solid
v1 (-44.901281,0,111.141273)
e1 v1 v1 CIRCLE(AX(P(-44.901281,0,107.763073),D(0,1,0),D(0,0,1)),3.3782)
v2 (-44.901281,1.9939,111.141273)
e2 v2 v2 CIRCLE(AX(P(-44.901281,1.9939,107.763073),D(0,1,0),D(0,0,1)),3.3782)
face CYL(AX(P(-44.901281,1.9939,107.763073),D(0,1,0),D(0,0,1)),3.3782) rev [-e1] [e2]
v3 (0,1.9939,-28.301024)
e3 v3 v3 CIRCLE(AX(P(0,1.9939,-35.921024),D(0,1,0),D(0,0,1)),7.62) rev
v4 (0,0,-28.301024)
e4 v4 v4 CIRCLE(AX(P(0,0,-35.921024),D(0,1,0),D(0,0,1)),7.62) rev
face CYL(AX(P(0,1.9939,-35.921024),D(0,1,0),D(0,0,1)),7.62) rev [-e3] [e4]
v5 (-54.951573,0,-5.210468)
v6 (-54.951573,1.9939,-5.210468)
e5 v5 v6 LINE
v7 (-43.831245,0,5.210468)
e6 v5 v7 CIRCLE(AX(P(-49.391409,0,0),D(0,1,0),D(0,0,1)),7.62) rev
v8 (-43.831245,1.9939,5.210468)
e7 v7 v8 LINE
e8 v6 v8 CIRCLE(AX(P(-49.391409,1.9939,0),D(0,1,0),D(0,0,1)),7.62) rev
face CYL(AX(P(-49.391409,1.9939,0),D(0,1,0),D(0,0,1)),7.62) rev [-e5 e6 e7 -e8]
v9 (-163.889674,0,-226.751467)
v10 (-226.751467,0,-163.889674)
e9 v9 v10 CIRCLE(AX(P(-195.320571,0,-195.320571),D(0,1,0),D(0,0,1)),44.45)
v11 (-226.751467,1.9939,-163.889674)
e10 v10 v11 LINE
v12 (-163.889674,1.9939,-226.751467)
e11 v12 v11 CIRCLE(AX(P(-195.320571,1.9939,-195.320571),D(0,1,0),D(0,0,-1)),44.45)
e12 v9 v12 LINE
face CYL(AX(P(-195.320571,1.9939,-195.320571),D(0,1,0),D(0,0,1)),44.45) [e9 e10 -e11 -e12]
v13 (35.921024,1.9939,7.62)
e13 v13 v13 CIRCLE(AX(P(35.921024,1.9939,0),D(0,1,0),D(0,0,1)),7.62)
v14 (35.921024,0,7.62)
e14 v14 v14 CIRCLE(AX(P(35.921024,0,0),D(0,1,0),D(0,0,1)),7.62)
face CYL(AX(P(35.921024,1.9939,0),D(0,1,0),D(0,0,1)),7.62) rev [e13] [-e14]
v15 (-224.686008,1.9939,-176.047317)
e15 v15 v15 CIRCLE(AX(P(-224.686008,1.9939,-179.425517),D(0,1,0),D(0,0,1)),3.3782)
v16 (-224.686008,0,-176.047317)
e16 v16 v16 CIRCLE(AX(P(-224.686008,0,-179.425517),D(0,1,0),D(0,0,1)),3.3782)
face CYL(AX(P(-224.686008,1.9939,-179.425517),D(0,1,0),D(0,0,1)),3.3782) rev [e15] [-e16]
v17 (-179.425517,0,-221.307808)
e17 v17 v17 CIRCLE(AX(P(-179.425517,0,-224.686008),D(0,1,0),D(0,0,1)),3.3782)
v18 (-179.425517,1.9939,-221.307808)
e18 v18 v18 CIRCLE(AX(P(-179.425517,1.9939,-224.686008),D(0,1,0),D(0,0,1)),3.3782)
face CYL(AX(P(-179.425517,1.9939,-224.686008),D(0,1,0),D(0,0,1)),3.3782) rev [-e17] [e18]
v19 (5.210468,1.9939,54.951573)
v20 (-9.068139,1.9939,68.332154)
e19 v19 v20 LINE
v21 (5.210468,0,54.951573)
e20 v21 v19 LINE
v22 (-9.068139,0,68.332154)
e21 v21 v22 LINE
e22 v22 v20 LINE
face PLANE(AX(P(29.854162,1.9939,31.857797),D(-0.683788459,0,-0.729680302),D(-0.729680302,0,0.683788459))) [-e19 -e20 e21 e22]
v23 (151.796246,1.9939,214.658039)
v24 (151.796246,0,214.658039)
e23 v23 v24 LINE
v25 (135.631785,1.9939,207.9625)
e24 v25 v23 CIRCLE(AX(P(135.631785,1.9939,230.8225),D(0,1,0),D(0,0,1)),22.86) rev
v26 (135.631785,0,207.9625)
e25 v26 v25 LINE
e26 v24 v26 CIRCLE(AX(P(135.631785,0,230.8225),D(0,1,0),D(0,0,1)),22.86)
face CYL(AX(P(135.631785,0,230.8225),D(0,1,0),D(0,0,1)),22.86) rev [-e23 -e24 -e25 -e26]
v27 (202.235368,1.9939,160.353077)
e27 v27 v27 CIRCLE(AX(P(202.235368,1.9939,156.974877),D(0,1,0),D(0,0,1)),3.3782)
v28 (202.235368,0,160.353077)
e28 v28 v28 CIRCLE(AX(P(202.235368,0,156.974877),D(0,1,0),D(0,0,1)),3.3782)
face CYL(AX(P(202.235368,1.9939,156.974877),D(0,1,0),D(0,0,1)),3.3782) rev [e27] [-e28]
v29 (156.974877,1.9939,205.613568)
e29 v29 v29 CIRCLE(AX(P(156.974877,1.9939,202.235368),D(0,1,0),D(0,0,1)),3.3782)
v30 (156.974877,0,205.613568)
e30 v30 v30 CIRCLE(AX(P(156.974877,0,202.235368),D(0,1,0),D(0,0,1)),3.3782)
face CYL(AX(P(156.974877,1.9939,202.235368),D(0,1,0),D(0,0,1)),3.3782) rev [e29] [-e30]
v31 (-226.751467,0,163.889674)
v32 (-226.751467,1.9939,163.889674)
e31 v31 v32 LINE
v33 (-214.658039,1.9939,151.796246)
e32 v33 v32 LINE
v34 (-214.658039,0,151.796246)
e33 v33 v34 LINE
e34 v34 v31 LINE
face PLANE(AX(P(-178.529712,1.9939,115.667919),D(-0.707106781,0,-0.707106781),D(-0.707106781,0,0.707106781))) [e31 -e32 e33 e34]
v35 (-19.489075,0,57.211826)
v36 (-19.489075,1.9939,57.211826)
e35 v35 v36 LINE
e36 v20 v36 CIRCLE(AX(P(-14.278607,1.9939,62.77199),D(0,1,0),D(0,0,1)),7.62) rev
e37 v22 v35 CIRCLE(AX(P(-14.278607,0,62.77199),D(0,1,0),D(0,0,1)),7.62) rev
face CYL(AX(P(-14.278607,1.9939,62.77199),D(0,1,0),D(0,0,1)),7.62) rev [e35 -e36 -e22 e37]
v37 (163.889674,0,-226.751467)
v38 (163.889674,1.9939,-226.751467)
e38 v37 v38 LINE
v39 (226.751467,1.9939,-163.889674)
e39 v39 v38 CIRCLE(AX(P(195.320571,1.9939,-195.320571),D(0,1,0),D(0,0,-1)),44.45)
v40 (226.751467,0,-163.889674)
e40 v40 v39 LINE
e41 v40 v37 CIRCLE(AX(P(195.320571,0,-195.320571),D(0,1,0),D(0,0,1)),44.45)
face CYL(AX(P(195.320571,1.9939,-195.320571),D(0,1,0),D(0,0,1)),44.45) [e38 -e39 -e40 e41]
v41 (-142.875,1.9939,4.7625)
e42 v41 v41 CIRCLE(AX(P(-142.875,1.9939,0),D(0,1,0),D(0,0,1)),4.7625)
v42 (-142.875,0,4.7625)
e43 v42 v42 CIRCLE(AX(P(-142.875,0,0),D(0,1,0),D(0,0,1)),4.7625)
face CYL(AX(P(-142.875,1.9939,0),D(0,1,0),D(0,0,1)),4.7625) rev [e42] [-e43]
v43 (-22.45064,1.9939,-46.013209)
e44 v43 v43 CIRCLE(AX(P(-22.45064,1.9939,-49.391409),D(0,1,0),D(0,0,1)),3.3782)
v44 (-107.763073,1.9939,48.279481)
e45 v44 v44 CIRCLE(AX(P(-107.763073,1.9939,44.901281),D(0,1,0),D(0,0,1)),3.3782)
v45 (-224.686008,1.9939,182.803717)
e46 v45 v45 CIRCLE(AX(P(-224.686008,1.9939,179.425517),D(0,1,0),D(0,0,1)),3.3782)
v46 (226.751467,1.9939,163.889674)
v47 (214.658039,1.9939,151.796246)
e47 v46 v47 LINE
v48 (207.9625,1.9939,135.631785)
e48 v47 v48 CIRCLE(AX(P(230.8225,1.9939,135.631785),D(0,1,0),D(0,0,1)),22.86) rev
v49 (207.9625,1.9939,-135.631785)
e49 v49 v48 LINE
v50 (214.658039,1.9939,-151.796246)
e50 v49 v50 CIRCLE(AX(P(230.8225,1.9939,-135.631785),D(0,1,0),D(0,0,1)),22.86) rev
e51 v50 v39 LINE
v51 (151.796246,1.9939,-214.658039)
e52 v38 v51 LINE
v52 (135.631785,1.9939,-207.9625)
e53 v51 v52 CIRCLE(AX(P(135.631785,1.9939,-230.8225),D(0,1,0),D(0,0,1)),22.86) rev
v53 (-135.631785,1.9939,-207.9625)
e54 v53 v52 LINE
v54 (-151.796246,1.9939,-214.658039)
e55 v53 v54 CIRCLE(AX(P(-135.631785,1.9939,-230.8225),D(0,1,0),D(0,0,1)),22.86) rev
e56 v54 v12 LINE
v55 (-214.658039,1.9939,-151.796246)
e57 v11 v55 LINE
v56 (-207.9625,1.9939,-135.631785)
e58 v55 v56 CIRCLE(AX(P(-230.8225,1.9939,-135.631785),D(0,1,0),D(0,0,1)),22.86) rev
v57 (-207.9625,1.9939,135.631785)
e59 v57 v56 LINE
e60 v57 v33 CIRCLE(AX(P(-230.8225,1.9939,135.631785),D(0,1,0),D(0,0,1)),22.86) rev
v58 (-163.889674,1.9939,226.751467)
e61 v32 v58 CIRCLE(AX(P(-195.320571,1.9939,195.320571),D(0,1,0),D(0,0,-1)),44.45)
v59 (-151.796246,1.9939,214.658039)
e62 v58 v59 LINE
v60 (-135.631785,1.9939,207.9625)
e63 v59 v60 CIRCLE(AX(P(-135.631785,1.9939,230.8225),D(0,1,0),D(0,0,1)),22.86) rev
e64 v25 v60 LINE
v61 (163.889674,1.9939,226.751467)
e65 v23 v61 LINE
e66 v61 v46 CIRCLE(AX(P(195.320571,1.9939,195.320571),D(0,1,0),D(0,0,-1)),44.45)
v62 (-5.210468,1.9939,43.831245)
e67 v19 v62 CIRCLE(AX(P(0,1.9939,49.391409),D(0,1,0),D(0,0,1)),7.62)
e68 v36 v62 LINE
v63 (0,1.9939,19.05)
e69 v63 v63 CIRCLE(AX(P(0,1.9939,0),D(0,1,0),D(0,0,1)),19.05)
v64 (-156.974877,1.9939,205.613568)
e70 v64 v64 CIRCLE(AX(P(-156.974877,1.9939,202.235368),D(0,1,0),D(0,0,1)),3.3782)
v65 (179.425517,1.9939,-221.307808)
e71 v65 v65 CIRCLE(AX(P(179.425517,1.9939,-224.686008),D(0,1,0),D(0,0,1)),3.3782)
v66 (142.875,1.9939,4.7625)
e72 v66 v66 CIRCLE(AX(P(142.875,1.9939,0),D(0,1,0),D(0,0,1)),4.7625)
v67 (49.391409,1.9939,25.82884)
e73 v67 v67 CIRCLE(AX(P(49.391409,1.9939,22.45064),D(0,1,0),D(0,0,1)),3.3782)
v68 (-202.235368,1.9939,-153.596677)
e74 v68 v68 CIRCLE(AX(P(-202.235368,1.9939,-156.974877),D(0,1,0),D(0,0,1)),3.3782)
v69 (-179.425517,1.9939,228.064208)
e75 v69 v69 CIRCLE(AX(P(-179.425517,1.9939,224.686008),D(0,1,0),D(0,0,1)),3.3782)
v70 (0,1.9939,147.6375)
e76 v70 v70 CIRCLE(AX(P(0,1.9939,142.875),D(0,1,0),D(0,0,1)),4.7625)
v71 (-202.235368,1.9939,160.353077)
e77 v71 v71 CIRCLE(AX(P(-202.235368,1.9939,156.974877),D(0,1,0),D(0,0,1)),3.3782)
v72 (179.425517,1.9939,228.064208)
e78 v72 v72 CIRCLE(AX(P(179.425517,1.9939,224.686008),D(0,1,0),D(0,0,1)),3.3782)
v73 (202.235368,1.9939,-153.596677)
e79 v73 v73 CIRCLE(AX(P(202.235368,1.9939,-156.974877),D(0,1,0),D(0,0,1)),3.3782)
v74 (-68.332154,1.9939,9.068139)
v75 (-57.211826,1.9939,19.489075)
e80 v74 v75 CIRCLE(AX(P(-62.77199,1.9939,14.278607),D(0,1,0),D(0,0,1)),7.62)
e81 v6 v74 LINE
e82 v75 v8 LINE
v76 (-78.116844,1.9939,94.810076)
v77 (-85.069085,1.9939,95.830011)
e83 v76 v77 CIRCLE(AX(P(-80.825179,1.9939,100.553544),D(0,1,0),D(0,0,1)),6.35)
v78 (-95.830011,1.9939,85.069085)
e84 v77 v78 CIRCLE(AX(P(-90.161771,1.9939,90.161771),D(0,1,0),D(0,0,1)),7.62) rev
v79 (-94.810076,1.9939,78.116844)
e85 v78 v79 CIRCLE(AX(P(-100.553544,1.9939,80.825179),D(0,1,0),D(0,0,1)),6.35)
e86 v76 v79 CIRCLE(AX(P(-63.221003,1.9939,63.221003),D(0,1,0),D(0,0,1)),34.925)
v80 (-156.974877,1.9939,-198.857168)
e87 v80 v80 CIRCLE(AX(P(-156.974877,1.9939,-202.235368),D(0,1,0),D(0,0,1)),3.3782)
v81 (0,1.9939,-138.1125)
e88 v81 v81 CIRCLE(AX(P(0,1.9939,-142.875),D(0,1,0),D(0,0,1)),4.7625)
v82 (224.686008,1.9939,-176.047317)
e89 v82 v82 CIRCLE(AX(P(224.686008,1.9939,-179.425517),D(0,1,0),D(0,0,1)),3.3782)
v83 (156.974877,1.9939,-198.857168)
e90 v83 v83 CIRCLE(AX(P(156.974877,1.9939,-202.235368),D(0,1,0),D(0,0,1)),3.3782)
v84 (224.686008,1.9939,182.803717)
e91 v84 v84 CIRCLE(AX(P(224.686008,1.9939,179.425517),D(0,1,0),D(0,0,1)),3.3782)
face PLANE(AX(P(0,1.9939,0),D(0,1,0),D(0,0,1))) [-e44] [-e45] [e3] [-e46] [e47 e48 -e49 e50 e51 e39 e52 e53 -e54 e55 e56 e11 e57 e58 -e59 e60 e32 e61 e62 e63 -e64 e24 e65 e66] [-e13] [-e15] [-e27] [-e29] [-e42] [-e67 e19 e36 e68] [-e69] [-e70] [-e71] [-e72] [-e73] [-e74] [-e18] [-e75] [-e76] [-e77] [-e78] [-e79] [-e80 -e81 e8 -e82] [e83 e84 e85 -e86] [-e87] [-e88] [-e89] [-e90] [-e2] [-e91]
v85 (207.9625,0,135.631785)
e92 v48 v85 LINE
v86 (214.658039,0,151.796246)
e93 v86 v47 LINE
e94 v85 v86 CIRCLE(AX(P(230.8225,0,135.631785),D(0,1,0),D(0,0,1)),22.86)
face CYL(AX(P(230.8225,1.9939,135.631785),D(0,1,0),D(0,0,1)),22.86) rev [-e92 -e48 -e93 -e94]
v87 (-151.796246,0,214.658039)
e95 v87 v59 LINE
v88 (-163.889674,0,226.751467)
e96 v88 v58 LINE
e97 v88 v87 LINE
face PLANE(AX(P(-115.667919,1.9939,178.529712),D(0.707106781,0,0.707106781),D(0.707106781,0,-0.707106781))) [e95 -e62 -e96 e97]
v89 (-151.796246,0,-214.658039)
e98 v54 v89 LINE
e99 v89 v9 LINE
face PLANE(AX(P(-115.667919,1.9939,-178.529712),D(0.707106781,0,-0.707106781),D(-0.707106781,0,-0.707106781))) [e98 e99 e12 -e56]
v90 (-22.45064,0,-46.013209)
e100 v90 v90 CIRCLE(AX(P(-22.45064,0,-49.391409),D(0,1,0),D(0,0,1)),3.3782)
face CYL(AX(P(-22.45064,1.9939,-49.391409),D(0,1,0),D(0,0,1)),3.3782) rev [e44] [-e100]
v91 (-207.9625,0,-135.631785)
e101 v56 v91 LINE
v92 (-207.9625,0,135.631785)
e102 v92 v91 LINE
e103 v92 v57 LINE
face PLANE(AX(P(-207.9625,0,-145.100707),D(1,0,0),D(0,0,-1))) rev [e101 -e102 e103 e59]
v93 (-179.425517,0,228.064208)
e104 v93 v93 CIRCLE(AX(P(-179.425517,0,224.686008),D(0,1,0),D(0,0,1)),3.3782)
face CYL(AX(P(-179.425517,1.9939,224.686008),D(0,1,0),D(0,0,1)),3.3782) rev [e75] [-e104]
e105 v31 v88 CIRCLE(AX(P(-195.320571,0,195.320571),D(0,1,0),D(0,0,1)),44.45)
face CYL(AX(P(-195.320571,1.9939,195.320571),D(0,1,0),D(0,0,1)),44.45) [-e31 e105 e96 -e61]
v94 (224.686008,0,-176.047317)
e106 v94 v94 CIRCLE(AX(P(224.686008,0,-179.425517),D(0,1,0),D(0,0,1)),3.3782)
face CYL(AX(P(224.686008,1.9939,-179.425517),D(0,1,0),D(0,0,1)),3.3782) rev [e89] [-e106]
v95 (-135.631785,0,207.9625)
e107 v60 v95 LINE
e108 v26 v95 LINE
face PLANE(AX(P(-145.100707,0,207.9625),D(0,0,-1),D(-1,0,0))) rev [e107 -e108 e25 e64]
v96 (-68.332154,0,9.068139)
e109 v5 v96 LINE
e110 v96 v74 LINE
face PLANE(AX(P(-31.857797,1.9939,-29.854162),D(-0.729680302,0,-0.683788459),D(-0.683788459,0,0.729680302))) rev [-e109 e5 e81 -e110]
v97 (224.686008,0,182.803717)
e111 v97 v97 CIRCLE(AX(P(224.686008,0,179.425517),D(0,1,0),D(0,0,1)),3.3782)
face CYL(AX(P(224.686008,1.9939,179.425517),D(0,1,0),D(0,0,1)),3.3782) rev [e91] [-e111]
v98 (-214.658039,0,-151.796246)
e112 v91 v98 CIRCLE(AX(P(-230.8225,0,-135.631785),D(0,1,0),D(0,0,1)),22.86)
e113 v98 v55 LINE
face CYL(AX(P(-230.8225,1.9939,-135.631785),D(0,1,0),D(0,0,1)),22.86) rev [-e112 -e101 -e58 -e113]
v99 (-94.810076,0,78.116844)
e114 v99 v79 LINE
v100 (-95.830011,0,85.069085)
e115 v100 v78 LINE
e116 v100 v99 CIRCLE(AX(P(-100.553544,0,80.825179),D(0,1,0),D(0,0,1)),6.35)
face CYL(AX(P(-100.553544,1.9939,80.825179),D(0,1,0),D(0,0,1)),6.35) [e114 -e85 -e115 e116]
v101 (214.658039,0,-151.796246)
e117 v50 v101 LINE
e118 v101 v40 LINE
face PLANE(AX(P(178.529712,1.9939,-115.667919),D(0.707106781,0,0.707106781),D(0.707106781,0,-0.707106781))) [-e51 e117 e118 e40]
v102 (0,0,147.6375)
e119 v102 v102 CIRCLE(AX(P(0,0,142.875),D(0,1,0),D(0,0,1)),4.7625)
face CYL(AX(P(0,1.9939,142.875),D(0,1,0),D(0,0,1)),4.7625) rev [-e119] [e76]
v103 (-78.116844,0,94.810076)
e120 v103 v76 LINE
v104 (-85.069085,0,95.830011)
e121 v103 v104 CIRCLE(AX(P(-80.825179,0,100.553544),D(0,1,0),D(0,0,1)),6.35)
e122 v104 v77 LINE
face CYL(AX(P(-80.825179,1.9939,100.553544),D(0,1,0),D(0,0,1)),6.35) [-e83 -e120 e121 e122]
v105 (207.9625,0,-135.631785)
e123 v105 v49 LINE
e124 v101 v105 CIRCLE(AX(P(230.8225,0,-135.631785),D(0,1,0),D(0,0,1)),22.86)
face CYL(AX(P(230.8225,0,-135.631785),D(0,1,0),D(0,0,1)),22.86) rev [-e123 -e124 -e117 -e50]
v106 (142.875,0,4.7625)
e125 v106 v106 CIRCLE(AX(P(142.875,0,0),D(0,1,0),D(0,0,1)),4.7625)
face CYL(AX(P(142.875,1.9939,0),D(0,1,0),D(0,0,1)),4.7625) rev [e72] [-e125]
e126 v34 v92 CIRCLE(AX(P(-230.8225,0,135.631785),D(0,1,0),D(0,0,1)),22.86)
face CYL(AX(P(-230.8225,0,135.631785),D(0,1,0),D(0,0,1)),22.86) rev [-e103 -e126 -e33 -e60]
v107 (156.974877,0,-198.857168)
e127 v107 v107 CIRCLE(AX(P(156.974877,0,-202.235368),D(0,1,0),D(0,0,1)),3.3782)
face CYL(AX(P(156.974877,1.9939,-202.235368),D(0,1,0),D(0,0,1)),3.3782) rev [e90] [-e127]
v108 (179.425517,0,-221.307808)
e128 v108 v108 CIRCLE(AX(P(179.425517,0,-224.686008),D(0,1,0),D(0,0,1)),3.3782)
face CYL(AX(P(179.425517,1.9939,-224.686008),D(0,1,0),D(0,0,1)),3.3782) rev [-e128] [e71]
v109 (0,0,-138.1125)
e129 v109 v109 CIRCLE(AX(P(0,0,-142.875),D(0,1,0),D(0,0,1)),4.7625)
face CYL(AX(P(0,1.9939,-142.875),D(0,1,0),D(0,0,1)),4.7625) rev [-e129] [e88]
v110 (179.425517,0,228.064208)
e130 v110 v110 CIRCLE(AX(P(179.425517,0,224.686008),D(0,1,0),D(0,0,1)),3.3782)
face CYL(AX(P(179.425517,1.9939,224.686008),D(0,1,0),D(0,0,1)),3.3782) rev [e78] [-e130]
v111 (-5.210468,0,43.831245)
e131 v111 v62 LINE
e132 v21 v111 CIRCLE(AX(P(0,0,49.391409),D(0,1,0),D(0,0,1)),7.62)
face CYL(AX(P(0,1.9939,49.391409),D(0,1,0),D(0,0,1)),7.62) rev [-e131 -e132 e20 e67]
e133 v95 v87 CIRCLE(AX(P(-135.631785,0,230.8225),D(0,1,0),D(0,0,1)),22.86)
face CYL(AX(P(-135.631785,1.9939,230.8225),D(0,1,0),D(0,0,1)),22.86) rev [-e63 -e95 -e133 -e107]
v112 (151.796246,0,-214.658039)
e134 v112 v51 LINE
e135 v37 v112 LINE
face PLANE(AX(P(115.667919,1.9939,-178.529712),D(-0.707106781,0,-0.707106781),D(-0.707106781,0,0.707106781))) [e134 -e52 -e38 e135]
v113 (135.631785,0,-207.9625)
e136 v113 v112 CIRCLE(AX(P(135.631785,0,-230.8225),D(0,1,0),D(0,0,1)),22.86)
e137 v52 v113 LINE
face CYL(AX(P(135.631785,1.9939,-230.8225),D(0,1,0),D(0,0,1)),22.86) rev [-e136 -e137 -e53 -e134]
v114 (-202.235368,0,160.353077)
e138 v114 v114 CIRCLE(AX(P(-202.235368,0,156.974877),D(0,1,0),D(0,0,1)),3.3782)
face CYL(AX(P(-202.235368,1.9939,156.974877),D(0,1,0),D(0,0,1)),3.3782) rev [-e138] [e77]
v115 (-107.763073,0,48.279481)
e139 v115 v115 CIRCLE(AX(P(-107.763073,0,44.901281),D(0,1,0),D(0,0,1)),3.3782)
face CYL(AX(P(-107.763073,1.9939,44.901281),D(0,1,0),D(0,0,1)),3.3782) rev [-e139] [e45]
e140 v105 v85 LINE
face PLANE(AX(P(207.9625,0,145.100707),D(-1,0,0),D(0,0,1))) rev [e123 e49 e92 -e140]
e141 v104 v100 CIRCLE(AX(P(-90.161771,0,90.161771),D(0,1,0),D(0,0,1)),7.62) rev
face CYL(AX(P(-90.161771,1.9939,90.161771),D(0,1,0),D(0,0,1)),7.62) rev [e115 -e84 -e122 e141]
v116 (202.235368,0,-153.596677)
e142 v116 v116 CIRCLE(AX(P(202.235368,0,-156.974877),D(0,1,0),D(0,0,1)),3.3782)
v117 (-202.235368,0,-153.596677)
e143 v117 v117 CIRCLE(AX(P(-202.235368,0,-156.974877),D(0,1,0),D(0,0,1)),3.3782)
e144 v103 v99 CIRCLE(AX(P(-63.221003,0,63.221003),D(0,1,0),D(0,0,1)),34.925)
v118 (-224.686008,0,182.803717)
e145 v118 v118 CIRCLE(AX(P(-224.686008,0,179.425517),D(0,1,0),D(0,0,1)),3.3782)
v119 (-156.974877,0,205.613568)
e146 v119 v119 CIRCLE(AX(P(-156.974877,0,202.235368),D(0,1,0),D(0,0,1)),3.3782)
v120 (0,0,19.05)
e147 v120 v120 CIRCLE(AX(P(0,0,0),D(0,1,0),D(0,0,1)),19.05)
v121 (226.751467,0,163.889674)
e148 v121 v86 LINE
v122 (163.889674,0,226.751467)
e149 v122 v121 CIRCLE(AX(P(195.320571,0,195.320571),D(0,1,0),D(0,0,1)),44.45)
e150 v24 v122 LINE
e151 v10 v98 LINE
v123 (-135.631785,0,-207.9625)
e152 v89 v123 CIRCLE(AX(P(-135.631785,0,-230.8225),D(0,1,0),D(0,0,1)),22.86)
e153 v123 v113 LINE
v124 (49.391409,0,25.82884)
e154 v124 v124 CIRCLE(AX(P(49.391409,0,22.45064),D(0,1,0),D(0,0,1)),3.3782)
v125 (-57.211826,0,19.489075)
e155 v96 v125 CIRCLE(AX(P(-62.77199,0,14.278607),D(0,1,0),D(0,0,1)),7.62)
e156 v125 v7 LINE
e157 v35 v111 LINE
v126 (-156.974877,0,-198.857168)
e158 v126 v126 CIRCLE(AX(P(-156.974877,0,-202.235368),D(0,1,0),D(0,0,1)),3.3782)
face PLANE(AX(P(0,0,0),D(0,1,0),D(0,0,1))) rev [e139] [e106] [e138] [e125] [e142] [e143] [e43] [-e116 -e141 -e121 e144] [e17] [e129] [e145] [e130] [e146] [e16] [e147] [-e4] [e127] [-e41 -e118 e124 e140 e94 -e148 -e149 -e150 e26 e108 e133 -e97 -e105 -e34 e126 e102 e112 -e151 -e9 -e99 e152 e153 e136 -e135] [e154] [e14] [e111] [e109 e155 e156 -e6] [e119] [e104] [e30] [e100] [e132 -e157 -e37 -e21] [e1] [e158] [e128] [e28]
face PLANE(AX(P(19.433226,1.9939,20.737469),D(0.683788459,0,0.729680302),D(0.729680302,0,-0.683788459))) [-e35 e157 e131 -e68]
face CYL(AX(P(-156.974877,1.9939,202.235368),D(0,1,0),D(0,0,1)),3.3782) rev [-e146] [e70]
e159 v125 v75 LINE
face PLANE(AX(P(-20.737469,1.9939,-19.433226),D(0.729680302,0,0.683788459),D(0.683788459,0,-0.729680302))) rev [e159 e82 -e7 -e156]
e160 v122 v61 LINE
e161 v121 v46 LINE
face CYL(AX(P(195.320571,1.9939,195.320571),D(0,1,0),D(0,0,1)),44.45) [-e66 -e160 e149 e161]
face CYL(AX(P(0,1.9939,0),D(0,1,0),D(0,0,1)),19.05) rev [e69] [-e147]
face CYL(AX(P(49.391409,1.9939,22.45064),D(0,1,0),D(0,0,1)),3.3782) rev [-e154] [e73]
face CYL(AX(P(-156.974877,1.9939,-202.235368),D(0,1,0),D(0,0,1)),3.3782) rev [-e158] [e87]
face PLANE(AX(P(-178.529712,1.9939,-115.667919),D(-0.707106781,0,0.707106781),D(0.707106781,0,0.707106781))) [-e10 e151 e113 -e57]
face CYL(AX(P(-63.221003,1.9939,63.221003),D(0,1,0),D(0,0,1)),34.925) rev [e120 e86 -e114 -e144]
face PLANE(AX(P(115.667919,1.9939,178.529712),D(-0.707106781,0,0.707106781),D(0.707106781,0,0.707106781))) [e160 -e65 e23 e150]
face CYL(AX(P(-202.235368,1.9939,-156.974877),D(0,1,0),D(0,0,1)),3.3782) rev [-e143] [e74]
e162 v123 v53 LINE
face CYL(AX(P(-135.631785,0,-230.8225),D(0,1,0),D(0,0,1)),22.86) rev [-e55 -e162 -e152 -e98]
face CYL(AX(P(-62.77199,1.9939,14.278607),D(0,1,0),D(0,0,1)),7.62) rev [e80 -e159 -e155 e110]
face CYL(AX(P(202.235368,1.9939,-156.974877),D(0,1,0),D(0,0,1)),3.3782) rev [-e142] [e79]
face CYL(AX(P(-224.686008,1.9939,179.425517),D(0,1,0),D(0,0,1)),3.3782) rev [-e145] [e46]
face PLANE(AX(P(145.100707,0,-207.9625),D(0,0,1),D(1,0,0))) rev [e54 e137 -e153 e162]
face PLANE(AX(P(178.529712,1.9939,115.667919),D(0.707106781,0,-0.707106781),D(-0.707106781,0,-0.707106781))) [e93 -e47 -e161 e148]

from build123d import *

# Parameters (mm, degrees)
SKETCH1_R                    = 212.725
BOSS_EXTRUDE1_DEPTH          = 1.9939
SKETCH2_R                    = 19.05
SKETCH2_R_2                  = 7.62
SKETCH2_R_3                  = 34.925
CUT_EXTRUDE1_DEPTH           = 301.845187575
BOSS_EXTRUDE2_START          = -1.9939
BOSS_EXTRUDE2_DEPTH          = 1.9939
FILLET1_R                    = 25.4
F_1_4_CLEARANCE_HOLE2_D      = 6.7564
FILLET2_R                    = 6.35
BOSS_EXTRUDE3_START          = -1.9939
BOSS_EXTRUDE3_DEPTH          = 1.9939
F_3_8_0_405_DIAMETER_HOLE1_D = 9.525
CUT_EXTRUDE2_DEPTH           = 340.09265521
FILLET3_R                    = 22.86


with BuildPart() as part:
    # Sketch1 → Boss-Extrude1 (new body)
    with BuildSketch(Plane(origin=(0, 0, 0), x_dir=(1, 0, 0), z_dir=(0, 1, 0))):
        with Locations(Location((0, 0, 0), (0, 0, 270))):
            Circle(SKETCH1_R)
    extrude(amount=BOSS_EXTRUDE1_DEPTH)

    # Sketch2 → Cut-Extrude1 (cut, through all)
    with BuildSketch(Plane(origin=(0, 1.9939, 0), x_dir=(1, 0, 0), z_dir=(0, 1, 0))):
        with Locations(Location((0, 0, 0), (0, 0, 270))):
            Circle(SKETCH2_R)
        with Locations(Location((35.921024484, 0, 0), (0, 0, 270))):
            Circle(SKETCH2_R_2)
        with Locations(Location((0, 35.921024484, 0), (0, 0, 270))):
            Circle(SKETCH2_R_2)
        with BuildLine():
            ThreePointArc((-54.951572567, 5.210468059), (-44.180940607, 5.560163901), (-43.831244764, -5.210468059))
            Line((-43.831244764, -5.210468059), (-57.211826385, -19.489075291))
            ThreePointArc((-57.211826385, -19.489075291), (-67.982458345, -19.838771134), (-68.332154188, -9.068139174))
            Line((-68.332154188, -9.068139174), (-54.951572567, 5.210468059))
        make_face()
        with BuildLine():
            ThreePointArc((-9.068139174, -68.332154188), (-19.838771134, -67.982458345), (-19.489075291, -57.211826385))
            Line((-19.489075291, -57.211826385), (-5.210468059, -43.831244764))
            ThreePointArc((-5.210468059, -43.831244764), (5.560163901, -44.180940607), (5.210468059, -54.951572567))
            Line((5.210468059, -54.951572567), (-9.068139174, -68.332154188))
        make_face()
        with Locations((-63.221003092, -63.221003092)):
            Circle(SKETCH2_R_3)
        with BuildLine():
            ThreePointArc((-82.803000118, -92.139872667), (-87.916707425, -87.916707425), (-92.139872667, -82.803000118))
            ThreePointArc((-92.139872667, -82.803000118), (-95.549925128, -95.549925128), (-82.803000118, -92.139872667))
        make_face()
    extrude(amount=-CUT_EXTRUDE1_DEPTH, mode=Mode.SUBTRACT)

    # Sketch3 → Boss-Extrude2 (add)
    with BuildSketch(Plane(origin=(0, 1.9939, 0), x_dir=(1, 0, 0), z_dir=(0, 1, 0)).offset(BOSS_EXTRUDE2_START)):
        with BuildLine():
            Line((178.529712063, -115.667919216), (226.751467057, -163.88967421))
            ThreePointArc((226.751467057, -163.88967421), (226.751467057, -226.751467057), (163.88967421, -226.751467057))
            Line((163.88967421, -226.751467057), (115.667919216, -178.529712063))
            ThreePointArc((115.667919216, -178.529712063), (150.419290028, -150.419290028), (178.529712063, -115.667919216))
        make_face()
        with BuildLine():
            Line((-178.529712063, -115.667919216), (-226.751467057, -163.88967421))
            ThreePointArc((-226.751467057, -163.88967421), (-226.751467057, -226.751467057), (-163.88967421, -226.751467057))
            Line((-163.88967421, -226.751467057), (-115.667919216, -178.529712063))
            ThreePointArc((-115.667919216, -178.529712063), (-150.419290028, -150.419290028), (-178.529712063, -115.667919216))
        make_face()
        with BuildLine():
            Line((-115.667919216, 178.529712063), (-163.88967421, 226.751467057))
            ThreePointArc((-163.88967421, 226.751467057), (-226.751467057, 226.751467057), (-226.751467057, 163.88967421))
            Line((-226.751467057, 163.88967421), (-178.529712063, 115.667919216))
            ThreePointArc((-178.529712063, 115.667919216), (-150.419290028, 150.419290028), (-115.667919216, 178.529712063))
        make_face()
        with BuildLine():
            Line((178.529712063, 115.667919216), (226.751467057, 163.88967421))
            ThreePointArc((226.751467057, 163.88967421), (226.751467057, 226.751467057), (163.88967421, 226.751467057))
            Line((163.88967421, 226.751467057), (115.667919216, 178.529712063))
            ThreePointArc((115.667919216, 178.529712063), (150.419290028, 150.419290028), (178.529712063, 115.667919216))
        make_face()
    extrude(amount=BOSS_EXTRUDE2_DEPTH)

    # Fillet1
    fillet1_edges = [part.edges().sort_by_distance(p)[0] for p in [
        (115.667919216, 0.99695, 178.529712063),
        (178.529712063, 0.99695, 115.667919216),
        (-178.529712063, 0.99695, 115.667919216),
        (-115.667919216, 0.99695, 178.529712063),
        (-115.667919216, 0.99695, -178.529712063),
        (-178.529712063, 0.99695, -115.667919216),
        (178.529712063, 0.99695, -115.667919216),
        (115.667919216, 0.99695, -178.529712063),
    ]]
    fillet(fillet1_edges, radius=FILLET1_R)

    # 1/4 Clearance Hole2 (through all)
    with Locations(Plane(origin=(0, 1.9939, 0), x_dir=(1, 0, 0), z_dir=(0, 1, 0))):
        with Locations((-202.235367846, 156.974876996), (-224.686008149, 179.425517299), (-156.974876996, 202.235367846), (-179.425517299, 224.686008149), (202.235367846, -156.974876996), (224.686008149, -179.425517299), (156.974876996, -202.235367846), (179.425517299, -224.686008149), (224.686008149, 179.425517299), (202.235367846, 156.974876996), (179.425517299, 224.686008149), (156.974876996, 202.235367846), (-202.235367846, -156.974876996), (-224.686008149, -179.425517299), (-156.974876996, -202.235367846), (-179.425517299, -224.686008149), (49.391408666, -22.450640303), (-44.901280605, -107.763073453), (-107.763073453, -44.901280605), (-22.450640303, 49.391408666)):
            Hole(F_1_4_CLEARANCE_HOLE2_D / 2)

    # Fillet2
    fillet2_edges = [part.edges().sort_by_distance(p)[0] for p in [
        (-92.139872667, 0.99695, 82.803000118),
        (-82.803000118, 0.99695, 92.139872667),
    ]]
    fillet(fillet2_edges, radius=FILLET2_R)

    # Sketch12 → Boss-Extrude3 (add)
    with BuildSketch(Plane(origin=(0, 1.9939, 0), x_dir=(1, 0, 0), z_dir=(0, 1, 0)).offset(BOSS_EXTRUDE3_START)):
        with BuildLine():
            Line((-129.541916692, -192.40370954), (-149.863207153, -212.725))
            Line((-149.863207153, -212.725), (0, -212.725))
            ThreePointArc((0, -212.725), (-51.359035142, -206.432010924), (-99.679387975, -187.925371459))
            ThreePointArc((-99.679387975, -187.925371459), (-115.348395389, -185.245109949), (-129.541916692, -192.40370954))
        make_face()
        with BuildLine():
            ThreePointArc((99.679387975, -187.925371459), (51.359035142, -206.432010924), (0, -212.725))
            Line((0, -212.725), (149.863207153, -212.725))
            Line((149.863207153, -212.725), (129.541916692, -192.40370954))
            ThreePointArc((129.541916692, -192.40370954), (115.348395389, -185.245109949), (99.679387975, -187.925371459))
        make_face()
        with BuildLine():
            ThreePointArc((-187.925371459, -99.679387975), (-206.432010924, -51.359035142), (-212.725, 0))
            Line((-212.725, 0), (-212.725, -149.863207153))
            Line((-212.725, -149.863207153), (-192.40370954, -129.541916692))
            ThreePointArc((-192.40370954, -129.541916692), (-185.245109949, -115.348395389), (-187.925371459, -99.679387975))
        make_face()
        with BuildLine():
            Line((-192.40370954, 129.541916692), (-212.725, 149.863207153))
            Line((-212.725, 149.863207153), (-212.725, 0))
            ThreePointArc((-212.725, 0), (-206.432010924, 51.359035142), (-187.925371459, 99.679387976))
            ThreePointArc((-187.925371459, 99.679387976), (-185.245109949, 115.348395389), (-192.40370954, 129.541916692))
        make_face()
        with BuildLine():
            ThreePointArc((-99.679387975, 187.925371459), (-51.359035455, 206.432010847), (-6.44e-07, 212.725))
            Line((-6.44e-07, 212.725), (-149.863207153, 212.725))
            Line((-149.863207153, 212.725), (-129.541916692, 192.40370954))
            ThreePointArc((-129.541916692, 192.40370954), (-115.348395389, 185.245109949), (-99.679387975, 187.925371459))
        make_face()
        with BuildLine():
            Line((129.541916692, 192.40370954), (149.863207153, 212.725))
            Line((149.863207153, 212.725), (-6.44e-07, 212.725))
            ThreePointArc((-6.44e-07, 212.725), (51.35903483, 206.432011002), (99.679387976, 187.925371459))
            ThreePointArc((99.679387976, 187.925371459), (115.348395389, 185.245109949), (129.541916692, 192.40370954))
        make_face()
        with BuildLine():
            ThreePointArc((187.925371459, 99.679387975), (206.432011089, 51.35903448), (212.725, -1.365e-06))
            Line((212.725, -1.365e-06), (212.725, 149.863207153))
            Line((212.725, 149.863207153), (192.40370954, 129.541916692))
            ThreePointArc((192.40370954, 129.541916692), (185.245109949, 115.348395389), (187.925371459, 99.679387975))
        make_face()
        with BuildLine():
            Line((192.40370954, -129.541916692), (212.725, -149.863207153))
            Line((212.725, -149.863207153), (212.725, -1.365e-06))
            ThreePointArc((212.725, -1.365e-06), (206.43201076, -51.359035805), (187.925371459, -99.679387976))
            ThreePointArc((187.925371459, -99.679387976), (185.245109949, -115.348395389), (192.40370954, -129.541916692))
        make_face()
    extrude(amount=BOSS_EXTRUDE3_DEPTH)

    # 3/8 (0.405) Diameter Hole1 (through all)
    with Locations(Plane(origin=(0, 1.9939, 0), x_dir=(1, 0, 0), z_dir=(0, 1, 0))):
        with Locations((0, -142.875), (-142.875, 0), (142.875, 0), (0, 142.875)):
            Hole(F_3_8_0_405_DIAMETER_HOLE1_D / 2)

    # Sketch32 → Cut-Extrude2 (cut, through all)
    with BuildSketch(Plane(origin=(0, 1.9939, 0), x_dir=(1, 0, 0), z_dir=(0, 1, 0))):
        Polygon((-149.863207153, -212.725), (-145.100707153, -207.9625), (145.100707153, -207.9625), (149.863207153, -212.725), align=None)
        Polygon((-212.725, 149.863207153), (-207.9625, 145.100707153), (-207.9625, -145.100707153), (-212.725, -149.863207153), align=None)
        Polygon((149.863207153, 212.725), (145.100707153, 207.9625), (-145.100707153, 207.9625), (-149.863207153, 212.725), align=None)
        Polygon((212.725, -149.863207153), (207.9625, -145.100707153), (207.9625, 145.100707153), (212.725, 149.863207153), align=None)
    extrude(amount=-CUT_EXTRUDE2_DEPTH, mode=Mode.SUBTRACT)

    # Fillet3
    fillet3_edges = [part.edges().sort_by_distance(p)[0] for p in [
        (-145.100707153, 0.99695, 207.9625),
        (145.100707153, 0.99695, 207.9625),
        (-207.9625, 0.99695, -145.100707153),
        (-207.9625, 0.99695, 145.100707153),
        (145.100707153, 0.99695, -207.9625),
        (-145.100707153, 0.99695, -207.9625),
        (207.9625, 0.99695, 145.100707153),
        (207.9625, 0.99695, -145.100707153),
    ]]
    fillet(fillet3_edges, radius=FILLET3_R)


solid = part.part
